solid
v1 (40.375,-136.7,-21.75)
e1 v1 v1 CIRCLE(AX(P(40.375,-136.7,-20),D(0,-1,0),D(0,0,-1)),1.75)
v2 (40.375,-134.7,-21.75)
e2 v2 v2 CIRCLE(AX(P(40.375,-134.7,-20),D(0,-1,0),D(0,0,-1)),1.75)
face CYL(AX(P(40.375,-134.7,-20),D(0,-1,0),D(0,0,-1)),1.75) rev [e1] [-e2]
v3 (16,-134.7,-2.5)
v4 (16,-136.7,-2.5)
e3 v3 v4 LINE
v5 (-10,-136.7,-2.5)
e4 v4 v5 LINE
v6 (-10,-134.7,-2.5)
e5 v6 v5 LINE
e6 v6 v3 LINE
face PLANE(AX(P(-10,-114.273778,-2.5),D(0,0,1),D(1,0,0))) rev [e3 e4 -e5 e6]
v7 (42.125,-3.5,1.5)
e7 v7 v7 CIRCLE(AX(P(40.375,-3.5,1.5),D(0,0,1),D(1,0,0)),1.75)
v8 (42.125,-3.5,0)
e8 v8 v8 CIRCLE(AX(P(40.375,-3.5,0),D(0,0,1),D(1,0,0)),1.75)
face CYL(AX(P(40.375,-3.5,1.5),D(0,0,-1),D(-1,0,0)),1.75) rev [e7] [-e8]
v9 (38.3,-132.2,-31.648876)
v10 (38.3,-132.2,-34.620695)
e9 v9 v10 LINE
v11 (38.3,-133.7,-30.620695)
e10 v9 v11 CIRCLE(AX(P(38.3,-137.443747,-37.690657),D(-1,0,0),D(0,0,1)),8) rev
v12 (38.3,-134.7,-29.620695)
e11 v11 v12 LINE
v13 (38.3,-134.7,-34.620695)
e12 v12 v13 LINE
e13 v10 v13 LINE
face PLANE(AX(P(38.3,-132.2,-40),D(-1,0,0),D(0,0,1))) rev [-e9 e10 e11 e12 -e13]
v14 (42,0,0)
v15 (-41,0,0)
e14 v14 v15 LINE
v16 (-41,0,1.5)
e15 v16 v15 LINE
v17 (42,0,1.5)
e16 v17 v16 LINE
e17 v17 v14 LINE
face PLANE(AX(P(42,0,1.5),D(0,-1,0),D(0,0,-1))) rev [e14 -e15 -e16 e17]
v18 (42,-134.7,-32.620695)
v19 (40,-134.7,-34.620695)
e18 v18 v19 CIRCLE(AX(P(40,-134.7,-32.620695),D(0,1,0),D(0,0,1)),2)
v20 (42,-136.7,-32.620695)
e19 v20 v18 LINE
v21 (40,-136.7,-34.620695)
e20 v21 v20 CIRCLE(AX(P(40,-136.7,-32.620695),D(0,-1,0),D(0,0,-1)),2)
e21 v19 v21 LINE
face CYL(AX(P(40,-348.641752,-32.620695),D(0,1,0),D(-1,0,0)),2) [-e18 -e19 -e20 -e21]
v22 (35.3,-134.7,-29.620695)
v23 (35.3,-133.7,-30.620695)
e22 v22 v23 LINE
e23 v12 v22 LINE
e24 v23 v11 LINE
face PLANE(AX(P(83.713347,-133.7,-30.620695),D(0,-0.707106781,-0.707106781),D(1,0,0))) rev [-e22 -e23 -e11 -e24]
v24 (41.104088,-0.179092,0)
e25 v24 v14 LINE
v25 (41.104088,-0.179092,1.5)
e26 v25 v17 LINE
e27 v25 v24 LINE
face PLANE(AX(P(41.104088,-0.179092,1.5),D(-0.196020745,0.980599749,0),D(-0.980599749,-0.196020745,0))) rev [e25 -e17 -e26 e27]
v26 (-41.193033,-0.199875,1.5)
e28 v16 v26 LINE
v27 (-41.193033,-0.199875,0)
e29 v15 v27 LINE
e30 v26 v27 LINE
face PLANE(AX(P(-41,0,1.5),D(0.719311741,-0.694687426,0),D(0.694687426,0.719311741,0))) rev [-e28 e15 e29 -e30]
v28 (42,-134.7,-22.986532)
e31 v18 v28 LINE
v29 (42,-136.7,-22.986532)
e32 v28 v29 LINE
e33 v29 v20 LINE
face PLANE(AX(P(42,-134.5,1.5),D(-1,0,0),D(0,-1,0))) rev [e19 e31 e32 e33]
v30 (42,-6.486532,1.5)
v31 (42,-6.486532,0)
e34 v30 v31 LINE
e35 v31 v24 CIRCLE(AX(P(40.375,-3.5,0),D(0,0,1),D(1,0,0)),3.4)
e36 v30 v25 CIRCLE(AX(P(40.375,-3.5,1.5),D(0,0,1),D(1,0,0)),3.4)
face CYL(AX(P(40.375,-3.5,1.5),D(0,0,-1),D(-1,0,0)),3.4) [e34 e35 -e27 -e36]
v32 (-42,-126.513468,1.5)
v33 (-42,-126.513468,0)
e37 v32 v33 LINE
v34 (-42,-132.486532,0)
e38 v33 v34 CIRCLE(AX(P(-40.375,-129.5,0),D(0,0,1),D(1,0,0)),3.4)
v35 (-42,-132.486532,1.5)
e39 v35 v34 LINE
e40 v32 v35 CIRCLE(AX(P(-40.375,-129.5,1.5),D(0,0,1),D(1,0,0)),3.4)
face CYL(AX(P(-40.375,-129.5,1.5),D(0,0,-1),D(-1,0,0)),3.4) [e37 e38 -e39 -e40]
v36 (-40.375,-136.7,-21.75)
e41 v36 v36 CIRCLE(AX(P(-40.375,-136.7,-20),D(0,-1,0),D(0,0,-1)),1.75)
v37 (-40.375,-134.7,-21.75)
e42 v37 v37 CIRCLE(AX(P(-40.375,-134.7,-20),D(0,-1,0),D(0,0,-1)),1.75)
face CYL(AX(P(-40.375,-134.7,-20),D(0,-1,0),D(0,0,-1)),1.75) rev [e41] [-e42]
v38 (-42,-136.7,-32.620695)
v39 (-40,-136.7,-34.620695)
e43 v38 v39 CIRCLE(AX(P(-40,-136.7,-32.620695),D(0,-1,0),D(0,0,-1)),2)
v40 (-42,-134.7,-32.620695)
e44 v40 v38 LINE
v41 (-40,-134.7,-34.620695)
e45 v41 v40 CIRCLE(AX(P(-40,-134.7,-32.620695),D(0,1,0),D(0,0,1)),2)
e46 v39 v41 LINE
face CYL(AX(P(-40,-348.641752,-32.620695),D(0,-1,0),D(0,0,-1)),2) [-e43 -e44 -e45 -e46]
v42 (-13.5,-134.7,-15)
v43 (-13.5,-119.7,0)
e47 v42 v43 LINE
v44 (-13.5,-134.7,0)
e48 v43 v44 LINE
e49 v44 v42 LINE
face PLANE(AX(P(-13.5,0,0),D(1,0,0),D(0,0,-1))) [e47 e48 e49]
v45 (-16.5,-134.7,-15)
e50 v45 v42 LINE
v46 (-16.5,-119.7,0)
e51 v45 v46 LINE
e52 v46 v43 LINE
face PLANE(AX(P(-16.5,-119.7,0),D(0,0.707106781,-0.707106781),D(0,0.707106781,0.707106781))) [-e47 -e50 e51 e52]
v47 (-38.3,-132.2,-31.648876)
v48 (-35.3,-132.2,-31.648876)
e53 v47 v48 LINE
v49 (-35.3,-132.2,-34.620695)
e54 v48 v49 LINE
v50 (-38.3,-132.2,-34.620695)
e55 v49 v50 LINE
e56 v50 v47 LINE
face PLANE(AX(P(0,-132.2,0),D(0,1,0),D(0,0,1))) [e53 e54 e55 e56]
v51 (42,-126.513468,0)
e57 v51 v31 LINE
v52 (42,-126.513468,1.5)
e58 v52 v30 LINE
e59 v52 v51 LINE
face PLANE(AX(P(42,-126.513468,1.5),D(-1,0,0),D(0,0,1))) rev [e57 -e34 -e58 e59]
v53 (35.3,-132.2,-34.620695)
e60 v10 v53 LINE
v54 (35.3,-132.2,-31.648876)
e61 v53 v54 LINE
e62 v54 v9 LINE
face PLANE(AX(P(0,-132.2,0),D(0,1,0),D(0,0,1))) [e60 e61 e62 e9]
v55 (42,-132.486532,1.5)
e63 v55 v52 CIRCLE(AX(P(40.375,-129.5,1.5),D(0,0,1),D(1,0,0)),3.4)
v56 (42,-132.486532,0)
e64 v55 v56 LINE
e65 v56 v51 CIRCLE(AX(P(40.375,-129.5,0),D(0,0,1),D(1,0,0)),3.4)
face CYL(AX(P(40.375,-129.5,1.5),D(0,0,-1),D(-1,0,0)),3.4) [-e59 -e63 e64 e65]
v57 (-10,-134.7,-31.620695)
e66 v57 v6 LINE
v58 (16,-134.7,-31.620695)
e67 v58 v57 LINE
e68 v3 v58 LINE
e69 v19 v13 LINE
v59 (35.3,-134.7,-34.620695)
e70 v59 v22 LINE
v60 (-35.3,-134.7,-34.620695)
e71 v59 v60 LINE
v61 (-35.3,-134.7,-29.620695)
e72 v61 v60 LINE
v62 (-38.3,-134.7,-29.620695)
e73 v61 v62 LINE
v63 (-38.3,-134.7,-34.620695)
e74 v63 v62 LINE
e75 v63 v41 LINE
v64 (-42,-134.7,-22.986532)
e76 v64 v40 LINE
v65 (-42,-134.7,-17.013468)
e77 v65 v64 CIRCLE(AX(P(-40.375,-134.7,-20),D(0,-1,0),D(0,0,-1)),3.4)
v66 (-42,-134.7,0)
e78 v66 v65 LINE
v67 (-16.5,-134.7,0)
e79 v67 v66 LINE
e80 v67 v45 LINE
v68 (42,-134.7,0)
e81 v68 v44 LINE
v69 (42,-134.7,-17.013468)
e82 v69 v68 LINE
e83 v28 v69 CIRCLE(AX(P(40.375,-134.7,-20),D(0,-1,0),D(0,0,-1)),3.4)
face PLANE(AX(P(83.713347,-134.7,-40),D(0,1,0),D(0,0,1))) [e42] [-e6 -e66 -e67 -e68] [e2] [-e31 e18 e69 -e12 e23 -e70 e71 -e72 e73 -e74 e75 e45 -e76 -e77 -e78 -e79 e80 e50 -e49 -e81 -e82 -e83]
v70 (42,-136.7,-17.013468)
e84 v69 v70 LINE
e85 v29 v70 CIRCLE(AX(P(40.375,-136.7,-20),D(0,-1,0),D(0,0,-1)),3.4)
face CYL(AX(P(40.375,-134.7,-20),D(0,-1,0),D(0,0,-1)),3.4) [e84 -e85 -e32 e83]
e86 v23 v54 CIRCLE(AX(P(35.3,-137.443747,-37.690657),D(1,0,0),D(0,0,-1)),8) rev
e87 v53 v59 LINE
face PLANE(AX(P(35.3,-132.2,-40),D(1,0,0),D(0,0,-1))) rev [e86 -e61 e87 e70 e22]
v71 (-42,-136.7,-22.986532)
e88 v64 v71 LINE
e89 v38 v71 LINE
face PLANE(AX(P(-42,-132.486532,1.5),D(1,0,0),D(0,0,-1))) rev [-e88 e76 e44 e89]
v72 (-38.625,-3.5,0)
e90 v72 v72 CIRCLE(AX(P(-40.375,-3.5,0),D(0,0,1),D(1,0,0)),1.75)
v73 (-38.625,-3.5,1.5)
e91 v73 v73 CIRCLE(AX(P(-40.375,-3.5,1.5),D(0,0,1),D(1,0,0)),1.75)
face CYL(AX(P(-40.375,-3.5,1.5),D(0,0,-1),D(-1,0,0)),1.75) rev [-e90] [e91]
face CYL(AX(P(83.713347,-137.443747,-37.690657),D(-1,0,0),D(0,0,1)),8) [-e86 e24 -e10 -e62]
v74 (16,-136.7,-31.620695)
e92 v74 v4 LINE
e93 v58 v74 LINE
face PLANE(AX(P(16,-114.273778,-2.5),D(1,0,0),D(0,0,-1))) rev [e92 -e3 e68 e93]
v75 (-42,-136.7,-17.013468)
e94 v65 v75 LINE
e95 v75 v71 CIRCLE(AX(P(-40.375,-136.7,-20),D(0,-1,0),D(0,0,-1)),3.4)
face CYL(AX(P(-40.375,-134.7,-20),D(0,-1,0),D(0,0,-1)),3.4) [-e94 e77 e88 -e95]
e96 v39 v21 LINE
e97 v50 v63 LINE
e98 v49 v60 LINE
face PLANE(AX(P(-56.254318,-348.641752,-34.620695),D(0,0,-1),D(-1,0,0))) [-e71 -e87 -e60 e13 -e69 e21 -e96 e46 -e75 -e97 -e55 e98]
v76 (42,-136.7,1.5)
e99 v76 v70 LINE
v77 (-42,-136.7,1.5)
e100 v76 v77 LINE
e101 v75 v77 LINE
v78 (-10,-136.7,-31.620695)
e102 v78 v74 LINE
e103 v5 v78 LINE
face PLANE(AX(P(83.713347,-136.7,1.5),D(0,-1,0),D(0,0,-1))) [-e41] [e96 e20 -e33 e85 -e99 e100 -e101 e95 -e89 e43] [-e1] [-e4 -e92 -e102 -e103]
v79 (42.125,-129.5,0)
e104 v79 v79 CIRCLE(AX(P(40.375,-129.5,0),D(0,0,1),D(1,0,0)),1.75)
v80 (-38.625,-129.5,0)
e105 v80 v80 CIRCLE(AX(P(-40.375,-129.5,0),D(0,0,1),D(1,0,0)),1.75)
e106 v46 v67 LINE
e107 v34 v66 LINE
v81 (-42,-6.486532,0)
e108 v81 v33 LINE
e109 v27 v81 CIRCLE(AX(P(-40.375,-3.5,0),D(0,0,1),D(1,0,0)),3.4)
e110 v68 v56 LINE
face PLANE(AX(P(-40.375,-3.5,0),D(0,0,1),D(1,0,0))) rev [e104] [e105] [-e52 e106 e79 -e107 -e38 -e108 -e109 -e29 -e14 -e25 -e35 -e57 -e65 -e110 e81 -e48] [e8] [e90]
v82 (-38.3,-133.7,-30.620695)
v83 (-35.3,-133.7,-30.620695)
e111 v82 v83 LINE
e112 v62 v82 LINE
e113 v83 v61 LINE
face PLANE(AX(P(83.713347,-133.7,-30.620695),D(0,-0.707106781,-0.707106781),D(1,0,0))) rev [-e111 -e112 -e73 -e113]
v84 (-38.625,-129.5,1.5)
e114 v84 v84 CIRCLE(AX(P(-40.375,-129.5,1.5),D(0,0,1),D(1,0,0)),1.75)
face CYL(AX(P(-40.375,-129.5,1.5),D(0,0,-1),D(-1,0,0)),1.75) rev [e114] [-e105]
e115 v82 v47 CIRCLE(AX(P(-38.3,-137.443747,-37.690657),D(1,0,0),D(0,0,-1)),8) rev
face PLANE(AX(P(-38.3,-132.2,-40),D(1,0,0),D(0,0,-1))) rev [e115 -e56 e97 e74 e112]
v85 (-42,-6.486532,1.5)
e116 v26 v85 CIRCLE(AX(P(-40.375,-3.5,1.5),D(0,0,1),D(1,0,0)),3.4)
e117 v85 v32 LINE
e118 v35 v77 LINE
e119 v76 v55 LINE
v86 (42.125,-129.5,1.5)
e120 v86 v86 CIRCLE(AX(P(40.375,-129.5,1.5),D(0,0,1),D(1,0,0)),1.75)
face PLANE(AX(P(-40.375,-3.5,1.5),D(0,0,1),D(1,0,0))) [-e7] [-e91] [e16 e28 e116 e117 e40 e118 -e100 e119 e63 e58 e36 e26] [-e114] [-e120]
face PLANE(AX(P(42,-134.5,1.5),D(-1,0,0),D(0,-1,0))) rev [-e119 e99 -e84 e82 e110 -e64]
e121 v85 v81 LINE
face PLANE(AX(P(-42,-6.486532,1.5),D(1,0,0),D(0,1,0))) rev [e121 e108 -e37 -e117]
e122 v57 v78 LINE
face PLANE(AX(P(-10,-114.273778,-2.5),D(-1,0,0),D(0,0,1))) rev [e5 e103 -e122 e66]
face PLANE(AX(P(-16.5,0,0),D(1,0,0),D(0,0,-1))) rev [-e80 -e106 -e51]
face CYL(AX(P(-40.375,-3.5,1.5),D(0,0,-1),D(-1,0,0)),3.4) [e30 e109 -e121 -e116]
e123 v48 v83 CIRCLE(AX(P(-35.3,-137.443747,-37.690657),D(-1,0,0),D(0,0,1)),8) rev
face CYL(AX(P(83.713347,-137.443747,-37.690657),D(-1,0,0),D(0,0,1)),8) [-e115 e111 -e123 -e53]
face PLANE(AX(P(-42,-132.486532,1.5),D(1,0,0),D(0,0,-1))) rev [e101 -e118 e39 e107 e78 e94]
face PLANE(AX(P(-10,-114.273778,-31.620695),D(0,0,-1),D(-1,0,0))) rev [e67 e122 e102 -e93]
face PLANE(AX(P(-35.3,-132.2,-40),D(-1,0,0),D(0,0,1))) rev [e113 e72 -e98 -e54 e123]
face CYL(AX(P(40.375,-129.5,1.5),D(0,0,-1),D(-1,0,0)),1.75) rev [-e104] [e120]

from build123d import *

# Parameters (mm, degrees)
SKETCH1_R                = 1.75
BOSS_EXTRUDE1_DEPTH      = 1.5
BOSS_EXTRUDE2_START      = -84
BOSS_EXTRUDE2_DEPTH      = 84
BOSS_EXTRUDE3_DEPTH      = 1.5
BOSS_EXTRUDE3_DEPTH_BACK = 1.5
BOSS_EXTRUDE4_DEPTH      = 2
SKETCH5_R                = 1.75
CUT_EXTRUDE1_DEPTH       = 2
CUT_EXTRUDE2_DEPTH       = 150.007183132
CUT_EXTRUDE2_DEPTH_BACK  = 150.007183132
SKETCH6_W                = 84
SKETCH6_H                = 5.379304891
BOSS_EXTRUDE6_START      = -2
SKETCH7_W                = 3
SKETCH7_H                = 4
BOSS_EXTRUDE6_DEPTH      = 2.5
FILLET1_R                = 2
CHAMFER1_SIZE            = 1
FILLET2_R                = 8
SKETCH8_W                = 26
SKETCH8_H                = 29.120695109
CUT_EXTRUDE3_DEPTH       = 22.4262221


with BuildPart() as part:
    # Sketch1 → Boss-Extrude1 (new body)
    with BuildSketch(Plane.XY):
        with BuildLine():
            Line((-38.75, -134.5), (38.75, -134.5))
            Line((38.75, -134.5), (42, -134.5))
            Line((42, -134.5), (42, -132.48653227))
            ThreePointArc((42, -132.48653227), (43.775, -129.5), (42, -126.51346773))
            Line((42, -126.51346773), (42, -6.48653227))
            ThreePointArc((42, -6.48653227), (43.741212037, -3.021861398), (41.104087703, -0.179091823))
            Line((41.104087703, -0.179091823), (42, 0))
            Line((42, 0), (-41, 0))
            Line((-41, 0), (-41.193033114, -0.199875483))
            ThreePointArc((-41.193033114, -0.199875483), (-43.747330957, -3.067121364), (-42, -6.48653227))
            Line((-42, -6.48653227), (-42, -126.51346773))
            ThreePointArc((-42, -126.51346773), (-43.775, -129.5), (-42, -132.48653227))
            Line((-42, -132.48653227), (-42, -134.5))
            Line((-42, -134.5), (-38.75, -134.5))
        make_face()
        with Locations((-40.375, -129.5)):
            Circle(SKETCH1_R, mode=Mode.SUBTRACT)
        with Locations((40.375, -129.5)):
            Circle(SKETCH1_R, mode=Mode.SUBTRACT)
        with Locations((40.375, -3.5)):
            Circle(SKETCH1_R, mode=Mode.SUBTRACT)
        with Locations((-40.375, -3.5)):
            Circle(SKETCH1_R, mode=Mode.SUBTRACT)
    extrude(amount=BOSS_EXTRUDE1_DEPTH)

    # Sketch2 → Boss-Extrude2 (add)
    with BuildSketch(Plane.ZY.offset(42).offset(BOSS_EXTRUDE2_START)):
        Polygon((1.5, -136.7), (1.5, -134.5), (0, -134.5), (0, -134.7), (-40, -134.7), (-40, -136.7), align=None)
    extrude(amount=BOSS_EXTRUDE2_DEPTH)

    # Sketch3 → Boss-Extrude3 (add, two sides: drawn at the far end of the back side and taken through both)
    with BuildSketch(Plane(origin=(-15, 0, 0), x_dir=(0, 0, -1), z_dir=(1, 0, 0)).offset(-BOSS_EXTRUDE3_DEPTH_BACK)):
        Polygon((0, -119.7), (15, -134.7), (0, -134.7), align=None)
    extrude(amount=BOSS_EXTRUDE3_DEPTH + BOSS_EXTRUDE3_DEPTH_BACK)

    # Sketch4 → Boss-Extrude4 (add)
    with BuildSketch(Plane.XZ.offset(136.7)):
        with BuildLine():
            Line((-42, -17.01346773), (-42, -22.98653227))
            ThreePointArc((-42, -22.98653227), (-43.775, -20), (-42, -17.01346773))
        make_face()
        with BuildLine():
            Line((42, -17.01346773), (42, -22.98653227))
            ThreePointArc((42, -22.98653227), (43.775, -20), (42, -17.01346773))
        make_face()
    extrude(amount=-BOSS_EXTRUDE4_DEPTH)

    # Sketch5 → Cut-Extrude1 (cut)
    with BuildSketch(Plane.XZ.offset(136.7)):
        with Locations(Location((40.375, -20, 0), (0, 0, 270))):
            Circle(SKETCH5_R)
        with Locations(Location((-40.375, -20, 0), (0, 0, 270))):
            Circle(SKETCH5_R)
    extrude(amount=-CUT_EXTRUDE1_DEPTH, mode=Mode.SUBTRACT)

    # Sketch6 → Cut-Extrude2 (cut, two sides: drawn at the far end of the back side and taken through both)
    with BuildSketch(Plane.XZ.offset(136.7).offset(-CUT_EXTRUDE2_DEPTH_BACK)):
        with Locations((0, -37.310347554)):
            Rectangle(SKETCH6_W, SKETCH6_H)
    extrude(amount=CUT_EXTRUDE2_DEPTH + CUT_EXTRUDE2_DEPTH_BACK, mode=Mode.SUBTRACT)

    # Sketch7 → Boss-Extrude6 (add)
    with BuildSketch(Plane.XZ.offset(136.7).offset(BOSS_EXTRUDE6_START)):
        with Locations((-36.8, -32.620695109)):
            Rectangle(SKETCH7_W, SKETCH7_H)
        with Locations((36.8, -32.620695109)):
            Rectangle(SKETCH7_W, SKETCH7_H)
    extrude(amount=-BOSS_EXTRUDE6_DEPTH)

    # Fillet1
    fillet1_edges = [part.edges().sort_by_distance(p)[0] for p in [
        (42, -135.7, -34.620695109),
        (-42, -135.7, -34.620695109),
    ]]
    fillet(fillet1_edges, radius=FILLET1_R)

    # Chamfer1
    chamfer1_edges = [part.edges().sort_by_distance(p)[0] for p in [
        (-36.8, -134.7, -30.620695109),
        (-36.8, -132.2, -30.620695109),
        (36.8, -134.7, -30.620695109),
        (36.8, -132.2, -30.620695109),
    ]]
    chamfer(chamfer1_edges, length=CHAMFER1_SIZE)

    # Fillet2
    # the kernel refuses this fillet: 8 mm, written as the material it takes off along each edge
    with BuildSketch(Plane(origin=(-30.303909917, -133.2, -30.620695109), x_dir=(0, -1.0, -1.111999381457983e-11), z_dir=(-1, 0, 0))) as fillet2_piece_1:
        with BuildLine():
            CenterArc((4.243746579, -7.06996192), FILLET2_R, 117.902496562, 17.097503438)
            Line((-1.413107671, -1.413107671), (0, 0))
            Line((0, 0), (0.5, 0))
        make_face()
    extrude(amount=12.992180166, mode=Mode.SUBTRACT)
    with BuildSketch(Plane(origin=(30.303909917, -133.2, -30.620695109), x_dir=(0, 0.7071067811865485, -0.7071067811865467), z_dir=(1, 0, 0))) as fillet2_piece_2:
        with BuildLine():
            CenterArc((1.998436033, -8), FILLET2_R, 90, 17.097503438)
            Line((-0.353553391, -0.353553391), (0, 0))
            Line((0, 0), (1.998436033, 0))
        make_face()
    extrude(amount=12.992180166, mode=Mode.SUBTRACT)

    # Sketch8 → Cut-Extrude3 (cut)
    with BuildSketch(Plane.XZ.offset(136.7)):
        with Locations((3, -17.060347555)):
            Rectangle(SKETCH8_W, SKETCH8_H)
    extrude(amount=-CUT_EXTRUDE3_DEPTH, mode=Mode.SUBTRACT)


solid = part.part
